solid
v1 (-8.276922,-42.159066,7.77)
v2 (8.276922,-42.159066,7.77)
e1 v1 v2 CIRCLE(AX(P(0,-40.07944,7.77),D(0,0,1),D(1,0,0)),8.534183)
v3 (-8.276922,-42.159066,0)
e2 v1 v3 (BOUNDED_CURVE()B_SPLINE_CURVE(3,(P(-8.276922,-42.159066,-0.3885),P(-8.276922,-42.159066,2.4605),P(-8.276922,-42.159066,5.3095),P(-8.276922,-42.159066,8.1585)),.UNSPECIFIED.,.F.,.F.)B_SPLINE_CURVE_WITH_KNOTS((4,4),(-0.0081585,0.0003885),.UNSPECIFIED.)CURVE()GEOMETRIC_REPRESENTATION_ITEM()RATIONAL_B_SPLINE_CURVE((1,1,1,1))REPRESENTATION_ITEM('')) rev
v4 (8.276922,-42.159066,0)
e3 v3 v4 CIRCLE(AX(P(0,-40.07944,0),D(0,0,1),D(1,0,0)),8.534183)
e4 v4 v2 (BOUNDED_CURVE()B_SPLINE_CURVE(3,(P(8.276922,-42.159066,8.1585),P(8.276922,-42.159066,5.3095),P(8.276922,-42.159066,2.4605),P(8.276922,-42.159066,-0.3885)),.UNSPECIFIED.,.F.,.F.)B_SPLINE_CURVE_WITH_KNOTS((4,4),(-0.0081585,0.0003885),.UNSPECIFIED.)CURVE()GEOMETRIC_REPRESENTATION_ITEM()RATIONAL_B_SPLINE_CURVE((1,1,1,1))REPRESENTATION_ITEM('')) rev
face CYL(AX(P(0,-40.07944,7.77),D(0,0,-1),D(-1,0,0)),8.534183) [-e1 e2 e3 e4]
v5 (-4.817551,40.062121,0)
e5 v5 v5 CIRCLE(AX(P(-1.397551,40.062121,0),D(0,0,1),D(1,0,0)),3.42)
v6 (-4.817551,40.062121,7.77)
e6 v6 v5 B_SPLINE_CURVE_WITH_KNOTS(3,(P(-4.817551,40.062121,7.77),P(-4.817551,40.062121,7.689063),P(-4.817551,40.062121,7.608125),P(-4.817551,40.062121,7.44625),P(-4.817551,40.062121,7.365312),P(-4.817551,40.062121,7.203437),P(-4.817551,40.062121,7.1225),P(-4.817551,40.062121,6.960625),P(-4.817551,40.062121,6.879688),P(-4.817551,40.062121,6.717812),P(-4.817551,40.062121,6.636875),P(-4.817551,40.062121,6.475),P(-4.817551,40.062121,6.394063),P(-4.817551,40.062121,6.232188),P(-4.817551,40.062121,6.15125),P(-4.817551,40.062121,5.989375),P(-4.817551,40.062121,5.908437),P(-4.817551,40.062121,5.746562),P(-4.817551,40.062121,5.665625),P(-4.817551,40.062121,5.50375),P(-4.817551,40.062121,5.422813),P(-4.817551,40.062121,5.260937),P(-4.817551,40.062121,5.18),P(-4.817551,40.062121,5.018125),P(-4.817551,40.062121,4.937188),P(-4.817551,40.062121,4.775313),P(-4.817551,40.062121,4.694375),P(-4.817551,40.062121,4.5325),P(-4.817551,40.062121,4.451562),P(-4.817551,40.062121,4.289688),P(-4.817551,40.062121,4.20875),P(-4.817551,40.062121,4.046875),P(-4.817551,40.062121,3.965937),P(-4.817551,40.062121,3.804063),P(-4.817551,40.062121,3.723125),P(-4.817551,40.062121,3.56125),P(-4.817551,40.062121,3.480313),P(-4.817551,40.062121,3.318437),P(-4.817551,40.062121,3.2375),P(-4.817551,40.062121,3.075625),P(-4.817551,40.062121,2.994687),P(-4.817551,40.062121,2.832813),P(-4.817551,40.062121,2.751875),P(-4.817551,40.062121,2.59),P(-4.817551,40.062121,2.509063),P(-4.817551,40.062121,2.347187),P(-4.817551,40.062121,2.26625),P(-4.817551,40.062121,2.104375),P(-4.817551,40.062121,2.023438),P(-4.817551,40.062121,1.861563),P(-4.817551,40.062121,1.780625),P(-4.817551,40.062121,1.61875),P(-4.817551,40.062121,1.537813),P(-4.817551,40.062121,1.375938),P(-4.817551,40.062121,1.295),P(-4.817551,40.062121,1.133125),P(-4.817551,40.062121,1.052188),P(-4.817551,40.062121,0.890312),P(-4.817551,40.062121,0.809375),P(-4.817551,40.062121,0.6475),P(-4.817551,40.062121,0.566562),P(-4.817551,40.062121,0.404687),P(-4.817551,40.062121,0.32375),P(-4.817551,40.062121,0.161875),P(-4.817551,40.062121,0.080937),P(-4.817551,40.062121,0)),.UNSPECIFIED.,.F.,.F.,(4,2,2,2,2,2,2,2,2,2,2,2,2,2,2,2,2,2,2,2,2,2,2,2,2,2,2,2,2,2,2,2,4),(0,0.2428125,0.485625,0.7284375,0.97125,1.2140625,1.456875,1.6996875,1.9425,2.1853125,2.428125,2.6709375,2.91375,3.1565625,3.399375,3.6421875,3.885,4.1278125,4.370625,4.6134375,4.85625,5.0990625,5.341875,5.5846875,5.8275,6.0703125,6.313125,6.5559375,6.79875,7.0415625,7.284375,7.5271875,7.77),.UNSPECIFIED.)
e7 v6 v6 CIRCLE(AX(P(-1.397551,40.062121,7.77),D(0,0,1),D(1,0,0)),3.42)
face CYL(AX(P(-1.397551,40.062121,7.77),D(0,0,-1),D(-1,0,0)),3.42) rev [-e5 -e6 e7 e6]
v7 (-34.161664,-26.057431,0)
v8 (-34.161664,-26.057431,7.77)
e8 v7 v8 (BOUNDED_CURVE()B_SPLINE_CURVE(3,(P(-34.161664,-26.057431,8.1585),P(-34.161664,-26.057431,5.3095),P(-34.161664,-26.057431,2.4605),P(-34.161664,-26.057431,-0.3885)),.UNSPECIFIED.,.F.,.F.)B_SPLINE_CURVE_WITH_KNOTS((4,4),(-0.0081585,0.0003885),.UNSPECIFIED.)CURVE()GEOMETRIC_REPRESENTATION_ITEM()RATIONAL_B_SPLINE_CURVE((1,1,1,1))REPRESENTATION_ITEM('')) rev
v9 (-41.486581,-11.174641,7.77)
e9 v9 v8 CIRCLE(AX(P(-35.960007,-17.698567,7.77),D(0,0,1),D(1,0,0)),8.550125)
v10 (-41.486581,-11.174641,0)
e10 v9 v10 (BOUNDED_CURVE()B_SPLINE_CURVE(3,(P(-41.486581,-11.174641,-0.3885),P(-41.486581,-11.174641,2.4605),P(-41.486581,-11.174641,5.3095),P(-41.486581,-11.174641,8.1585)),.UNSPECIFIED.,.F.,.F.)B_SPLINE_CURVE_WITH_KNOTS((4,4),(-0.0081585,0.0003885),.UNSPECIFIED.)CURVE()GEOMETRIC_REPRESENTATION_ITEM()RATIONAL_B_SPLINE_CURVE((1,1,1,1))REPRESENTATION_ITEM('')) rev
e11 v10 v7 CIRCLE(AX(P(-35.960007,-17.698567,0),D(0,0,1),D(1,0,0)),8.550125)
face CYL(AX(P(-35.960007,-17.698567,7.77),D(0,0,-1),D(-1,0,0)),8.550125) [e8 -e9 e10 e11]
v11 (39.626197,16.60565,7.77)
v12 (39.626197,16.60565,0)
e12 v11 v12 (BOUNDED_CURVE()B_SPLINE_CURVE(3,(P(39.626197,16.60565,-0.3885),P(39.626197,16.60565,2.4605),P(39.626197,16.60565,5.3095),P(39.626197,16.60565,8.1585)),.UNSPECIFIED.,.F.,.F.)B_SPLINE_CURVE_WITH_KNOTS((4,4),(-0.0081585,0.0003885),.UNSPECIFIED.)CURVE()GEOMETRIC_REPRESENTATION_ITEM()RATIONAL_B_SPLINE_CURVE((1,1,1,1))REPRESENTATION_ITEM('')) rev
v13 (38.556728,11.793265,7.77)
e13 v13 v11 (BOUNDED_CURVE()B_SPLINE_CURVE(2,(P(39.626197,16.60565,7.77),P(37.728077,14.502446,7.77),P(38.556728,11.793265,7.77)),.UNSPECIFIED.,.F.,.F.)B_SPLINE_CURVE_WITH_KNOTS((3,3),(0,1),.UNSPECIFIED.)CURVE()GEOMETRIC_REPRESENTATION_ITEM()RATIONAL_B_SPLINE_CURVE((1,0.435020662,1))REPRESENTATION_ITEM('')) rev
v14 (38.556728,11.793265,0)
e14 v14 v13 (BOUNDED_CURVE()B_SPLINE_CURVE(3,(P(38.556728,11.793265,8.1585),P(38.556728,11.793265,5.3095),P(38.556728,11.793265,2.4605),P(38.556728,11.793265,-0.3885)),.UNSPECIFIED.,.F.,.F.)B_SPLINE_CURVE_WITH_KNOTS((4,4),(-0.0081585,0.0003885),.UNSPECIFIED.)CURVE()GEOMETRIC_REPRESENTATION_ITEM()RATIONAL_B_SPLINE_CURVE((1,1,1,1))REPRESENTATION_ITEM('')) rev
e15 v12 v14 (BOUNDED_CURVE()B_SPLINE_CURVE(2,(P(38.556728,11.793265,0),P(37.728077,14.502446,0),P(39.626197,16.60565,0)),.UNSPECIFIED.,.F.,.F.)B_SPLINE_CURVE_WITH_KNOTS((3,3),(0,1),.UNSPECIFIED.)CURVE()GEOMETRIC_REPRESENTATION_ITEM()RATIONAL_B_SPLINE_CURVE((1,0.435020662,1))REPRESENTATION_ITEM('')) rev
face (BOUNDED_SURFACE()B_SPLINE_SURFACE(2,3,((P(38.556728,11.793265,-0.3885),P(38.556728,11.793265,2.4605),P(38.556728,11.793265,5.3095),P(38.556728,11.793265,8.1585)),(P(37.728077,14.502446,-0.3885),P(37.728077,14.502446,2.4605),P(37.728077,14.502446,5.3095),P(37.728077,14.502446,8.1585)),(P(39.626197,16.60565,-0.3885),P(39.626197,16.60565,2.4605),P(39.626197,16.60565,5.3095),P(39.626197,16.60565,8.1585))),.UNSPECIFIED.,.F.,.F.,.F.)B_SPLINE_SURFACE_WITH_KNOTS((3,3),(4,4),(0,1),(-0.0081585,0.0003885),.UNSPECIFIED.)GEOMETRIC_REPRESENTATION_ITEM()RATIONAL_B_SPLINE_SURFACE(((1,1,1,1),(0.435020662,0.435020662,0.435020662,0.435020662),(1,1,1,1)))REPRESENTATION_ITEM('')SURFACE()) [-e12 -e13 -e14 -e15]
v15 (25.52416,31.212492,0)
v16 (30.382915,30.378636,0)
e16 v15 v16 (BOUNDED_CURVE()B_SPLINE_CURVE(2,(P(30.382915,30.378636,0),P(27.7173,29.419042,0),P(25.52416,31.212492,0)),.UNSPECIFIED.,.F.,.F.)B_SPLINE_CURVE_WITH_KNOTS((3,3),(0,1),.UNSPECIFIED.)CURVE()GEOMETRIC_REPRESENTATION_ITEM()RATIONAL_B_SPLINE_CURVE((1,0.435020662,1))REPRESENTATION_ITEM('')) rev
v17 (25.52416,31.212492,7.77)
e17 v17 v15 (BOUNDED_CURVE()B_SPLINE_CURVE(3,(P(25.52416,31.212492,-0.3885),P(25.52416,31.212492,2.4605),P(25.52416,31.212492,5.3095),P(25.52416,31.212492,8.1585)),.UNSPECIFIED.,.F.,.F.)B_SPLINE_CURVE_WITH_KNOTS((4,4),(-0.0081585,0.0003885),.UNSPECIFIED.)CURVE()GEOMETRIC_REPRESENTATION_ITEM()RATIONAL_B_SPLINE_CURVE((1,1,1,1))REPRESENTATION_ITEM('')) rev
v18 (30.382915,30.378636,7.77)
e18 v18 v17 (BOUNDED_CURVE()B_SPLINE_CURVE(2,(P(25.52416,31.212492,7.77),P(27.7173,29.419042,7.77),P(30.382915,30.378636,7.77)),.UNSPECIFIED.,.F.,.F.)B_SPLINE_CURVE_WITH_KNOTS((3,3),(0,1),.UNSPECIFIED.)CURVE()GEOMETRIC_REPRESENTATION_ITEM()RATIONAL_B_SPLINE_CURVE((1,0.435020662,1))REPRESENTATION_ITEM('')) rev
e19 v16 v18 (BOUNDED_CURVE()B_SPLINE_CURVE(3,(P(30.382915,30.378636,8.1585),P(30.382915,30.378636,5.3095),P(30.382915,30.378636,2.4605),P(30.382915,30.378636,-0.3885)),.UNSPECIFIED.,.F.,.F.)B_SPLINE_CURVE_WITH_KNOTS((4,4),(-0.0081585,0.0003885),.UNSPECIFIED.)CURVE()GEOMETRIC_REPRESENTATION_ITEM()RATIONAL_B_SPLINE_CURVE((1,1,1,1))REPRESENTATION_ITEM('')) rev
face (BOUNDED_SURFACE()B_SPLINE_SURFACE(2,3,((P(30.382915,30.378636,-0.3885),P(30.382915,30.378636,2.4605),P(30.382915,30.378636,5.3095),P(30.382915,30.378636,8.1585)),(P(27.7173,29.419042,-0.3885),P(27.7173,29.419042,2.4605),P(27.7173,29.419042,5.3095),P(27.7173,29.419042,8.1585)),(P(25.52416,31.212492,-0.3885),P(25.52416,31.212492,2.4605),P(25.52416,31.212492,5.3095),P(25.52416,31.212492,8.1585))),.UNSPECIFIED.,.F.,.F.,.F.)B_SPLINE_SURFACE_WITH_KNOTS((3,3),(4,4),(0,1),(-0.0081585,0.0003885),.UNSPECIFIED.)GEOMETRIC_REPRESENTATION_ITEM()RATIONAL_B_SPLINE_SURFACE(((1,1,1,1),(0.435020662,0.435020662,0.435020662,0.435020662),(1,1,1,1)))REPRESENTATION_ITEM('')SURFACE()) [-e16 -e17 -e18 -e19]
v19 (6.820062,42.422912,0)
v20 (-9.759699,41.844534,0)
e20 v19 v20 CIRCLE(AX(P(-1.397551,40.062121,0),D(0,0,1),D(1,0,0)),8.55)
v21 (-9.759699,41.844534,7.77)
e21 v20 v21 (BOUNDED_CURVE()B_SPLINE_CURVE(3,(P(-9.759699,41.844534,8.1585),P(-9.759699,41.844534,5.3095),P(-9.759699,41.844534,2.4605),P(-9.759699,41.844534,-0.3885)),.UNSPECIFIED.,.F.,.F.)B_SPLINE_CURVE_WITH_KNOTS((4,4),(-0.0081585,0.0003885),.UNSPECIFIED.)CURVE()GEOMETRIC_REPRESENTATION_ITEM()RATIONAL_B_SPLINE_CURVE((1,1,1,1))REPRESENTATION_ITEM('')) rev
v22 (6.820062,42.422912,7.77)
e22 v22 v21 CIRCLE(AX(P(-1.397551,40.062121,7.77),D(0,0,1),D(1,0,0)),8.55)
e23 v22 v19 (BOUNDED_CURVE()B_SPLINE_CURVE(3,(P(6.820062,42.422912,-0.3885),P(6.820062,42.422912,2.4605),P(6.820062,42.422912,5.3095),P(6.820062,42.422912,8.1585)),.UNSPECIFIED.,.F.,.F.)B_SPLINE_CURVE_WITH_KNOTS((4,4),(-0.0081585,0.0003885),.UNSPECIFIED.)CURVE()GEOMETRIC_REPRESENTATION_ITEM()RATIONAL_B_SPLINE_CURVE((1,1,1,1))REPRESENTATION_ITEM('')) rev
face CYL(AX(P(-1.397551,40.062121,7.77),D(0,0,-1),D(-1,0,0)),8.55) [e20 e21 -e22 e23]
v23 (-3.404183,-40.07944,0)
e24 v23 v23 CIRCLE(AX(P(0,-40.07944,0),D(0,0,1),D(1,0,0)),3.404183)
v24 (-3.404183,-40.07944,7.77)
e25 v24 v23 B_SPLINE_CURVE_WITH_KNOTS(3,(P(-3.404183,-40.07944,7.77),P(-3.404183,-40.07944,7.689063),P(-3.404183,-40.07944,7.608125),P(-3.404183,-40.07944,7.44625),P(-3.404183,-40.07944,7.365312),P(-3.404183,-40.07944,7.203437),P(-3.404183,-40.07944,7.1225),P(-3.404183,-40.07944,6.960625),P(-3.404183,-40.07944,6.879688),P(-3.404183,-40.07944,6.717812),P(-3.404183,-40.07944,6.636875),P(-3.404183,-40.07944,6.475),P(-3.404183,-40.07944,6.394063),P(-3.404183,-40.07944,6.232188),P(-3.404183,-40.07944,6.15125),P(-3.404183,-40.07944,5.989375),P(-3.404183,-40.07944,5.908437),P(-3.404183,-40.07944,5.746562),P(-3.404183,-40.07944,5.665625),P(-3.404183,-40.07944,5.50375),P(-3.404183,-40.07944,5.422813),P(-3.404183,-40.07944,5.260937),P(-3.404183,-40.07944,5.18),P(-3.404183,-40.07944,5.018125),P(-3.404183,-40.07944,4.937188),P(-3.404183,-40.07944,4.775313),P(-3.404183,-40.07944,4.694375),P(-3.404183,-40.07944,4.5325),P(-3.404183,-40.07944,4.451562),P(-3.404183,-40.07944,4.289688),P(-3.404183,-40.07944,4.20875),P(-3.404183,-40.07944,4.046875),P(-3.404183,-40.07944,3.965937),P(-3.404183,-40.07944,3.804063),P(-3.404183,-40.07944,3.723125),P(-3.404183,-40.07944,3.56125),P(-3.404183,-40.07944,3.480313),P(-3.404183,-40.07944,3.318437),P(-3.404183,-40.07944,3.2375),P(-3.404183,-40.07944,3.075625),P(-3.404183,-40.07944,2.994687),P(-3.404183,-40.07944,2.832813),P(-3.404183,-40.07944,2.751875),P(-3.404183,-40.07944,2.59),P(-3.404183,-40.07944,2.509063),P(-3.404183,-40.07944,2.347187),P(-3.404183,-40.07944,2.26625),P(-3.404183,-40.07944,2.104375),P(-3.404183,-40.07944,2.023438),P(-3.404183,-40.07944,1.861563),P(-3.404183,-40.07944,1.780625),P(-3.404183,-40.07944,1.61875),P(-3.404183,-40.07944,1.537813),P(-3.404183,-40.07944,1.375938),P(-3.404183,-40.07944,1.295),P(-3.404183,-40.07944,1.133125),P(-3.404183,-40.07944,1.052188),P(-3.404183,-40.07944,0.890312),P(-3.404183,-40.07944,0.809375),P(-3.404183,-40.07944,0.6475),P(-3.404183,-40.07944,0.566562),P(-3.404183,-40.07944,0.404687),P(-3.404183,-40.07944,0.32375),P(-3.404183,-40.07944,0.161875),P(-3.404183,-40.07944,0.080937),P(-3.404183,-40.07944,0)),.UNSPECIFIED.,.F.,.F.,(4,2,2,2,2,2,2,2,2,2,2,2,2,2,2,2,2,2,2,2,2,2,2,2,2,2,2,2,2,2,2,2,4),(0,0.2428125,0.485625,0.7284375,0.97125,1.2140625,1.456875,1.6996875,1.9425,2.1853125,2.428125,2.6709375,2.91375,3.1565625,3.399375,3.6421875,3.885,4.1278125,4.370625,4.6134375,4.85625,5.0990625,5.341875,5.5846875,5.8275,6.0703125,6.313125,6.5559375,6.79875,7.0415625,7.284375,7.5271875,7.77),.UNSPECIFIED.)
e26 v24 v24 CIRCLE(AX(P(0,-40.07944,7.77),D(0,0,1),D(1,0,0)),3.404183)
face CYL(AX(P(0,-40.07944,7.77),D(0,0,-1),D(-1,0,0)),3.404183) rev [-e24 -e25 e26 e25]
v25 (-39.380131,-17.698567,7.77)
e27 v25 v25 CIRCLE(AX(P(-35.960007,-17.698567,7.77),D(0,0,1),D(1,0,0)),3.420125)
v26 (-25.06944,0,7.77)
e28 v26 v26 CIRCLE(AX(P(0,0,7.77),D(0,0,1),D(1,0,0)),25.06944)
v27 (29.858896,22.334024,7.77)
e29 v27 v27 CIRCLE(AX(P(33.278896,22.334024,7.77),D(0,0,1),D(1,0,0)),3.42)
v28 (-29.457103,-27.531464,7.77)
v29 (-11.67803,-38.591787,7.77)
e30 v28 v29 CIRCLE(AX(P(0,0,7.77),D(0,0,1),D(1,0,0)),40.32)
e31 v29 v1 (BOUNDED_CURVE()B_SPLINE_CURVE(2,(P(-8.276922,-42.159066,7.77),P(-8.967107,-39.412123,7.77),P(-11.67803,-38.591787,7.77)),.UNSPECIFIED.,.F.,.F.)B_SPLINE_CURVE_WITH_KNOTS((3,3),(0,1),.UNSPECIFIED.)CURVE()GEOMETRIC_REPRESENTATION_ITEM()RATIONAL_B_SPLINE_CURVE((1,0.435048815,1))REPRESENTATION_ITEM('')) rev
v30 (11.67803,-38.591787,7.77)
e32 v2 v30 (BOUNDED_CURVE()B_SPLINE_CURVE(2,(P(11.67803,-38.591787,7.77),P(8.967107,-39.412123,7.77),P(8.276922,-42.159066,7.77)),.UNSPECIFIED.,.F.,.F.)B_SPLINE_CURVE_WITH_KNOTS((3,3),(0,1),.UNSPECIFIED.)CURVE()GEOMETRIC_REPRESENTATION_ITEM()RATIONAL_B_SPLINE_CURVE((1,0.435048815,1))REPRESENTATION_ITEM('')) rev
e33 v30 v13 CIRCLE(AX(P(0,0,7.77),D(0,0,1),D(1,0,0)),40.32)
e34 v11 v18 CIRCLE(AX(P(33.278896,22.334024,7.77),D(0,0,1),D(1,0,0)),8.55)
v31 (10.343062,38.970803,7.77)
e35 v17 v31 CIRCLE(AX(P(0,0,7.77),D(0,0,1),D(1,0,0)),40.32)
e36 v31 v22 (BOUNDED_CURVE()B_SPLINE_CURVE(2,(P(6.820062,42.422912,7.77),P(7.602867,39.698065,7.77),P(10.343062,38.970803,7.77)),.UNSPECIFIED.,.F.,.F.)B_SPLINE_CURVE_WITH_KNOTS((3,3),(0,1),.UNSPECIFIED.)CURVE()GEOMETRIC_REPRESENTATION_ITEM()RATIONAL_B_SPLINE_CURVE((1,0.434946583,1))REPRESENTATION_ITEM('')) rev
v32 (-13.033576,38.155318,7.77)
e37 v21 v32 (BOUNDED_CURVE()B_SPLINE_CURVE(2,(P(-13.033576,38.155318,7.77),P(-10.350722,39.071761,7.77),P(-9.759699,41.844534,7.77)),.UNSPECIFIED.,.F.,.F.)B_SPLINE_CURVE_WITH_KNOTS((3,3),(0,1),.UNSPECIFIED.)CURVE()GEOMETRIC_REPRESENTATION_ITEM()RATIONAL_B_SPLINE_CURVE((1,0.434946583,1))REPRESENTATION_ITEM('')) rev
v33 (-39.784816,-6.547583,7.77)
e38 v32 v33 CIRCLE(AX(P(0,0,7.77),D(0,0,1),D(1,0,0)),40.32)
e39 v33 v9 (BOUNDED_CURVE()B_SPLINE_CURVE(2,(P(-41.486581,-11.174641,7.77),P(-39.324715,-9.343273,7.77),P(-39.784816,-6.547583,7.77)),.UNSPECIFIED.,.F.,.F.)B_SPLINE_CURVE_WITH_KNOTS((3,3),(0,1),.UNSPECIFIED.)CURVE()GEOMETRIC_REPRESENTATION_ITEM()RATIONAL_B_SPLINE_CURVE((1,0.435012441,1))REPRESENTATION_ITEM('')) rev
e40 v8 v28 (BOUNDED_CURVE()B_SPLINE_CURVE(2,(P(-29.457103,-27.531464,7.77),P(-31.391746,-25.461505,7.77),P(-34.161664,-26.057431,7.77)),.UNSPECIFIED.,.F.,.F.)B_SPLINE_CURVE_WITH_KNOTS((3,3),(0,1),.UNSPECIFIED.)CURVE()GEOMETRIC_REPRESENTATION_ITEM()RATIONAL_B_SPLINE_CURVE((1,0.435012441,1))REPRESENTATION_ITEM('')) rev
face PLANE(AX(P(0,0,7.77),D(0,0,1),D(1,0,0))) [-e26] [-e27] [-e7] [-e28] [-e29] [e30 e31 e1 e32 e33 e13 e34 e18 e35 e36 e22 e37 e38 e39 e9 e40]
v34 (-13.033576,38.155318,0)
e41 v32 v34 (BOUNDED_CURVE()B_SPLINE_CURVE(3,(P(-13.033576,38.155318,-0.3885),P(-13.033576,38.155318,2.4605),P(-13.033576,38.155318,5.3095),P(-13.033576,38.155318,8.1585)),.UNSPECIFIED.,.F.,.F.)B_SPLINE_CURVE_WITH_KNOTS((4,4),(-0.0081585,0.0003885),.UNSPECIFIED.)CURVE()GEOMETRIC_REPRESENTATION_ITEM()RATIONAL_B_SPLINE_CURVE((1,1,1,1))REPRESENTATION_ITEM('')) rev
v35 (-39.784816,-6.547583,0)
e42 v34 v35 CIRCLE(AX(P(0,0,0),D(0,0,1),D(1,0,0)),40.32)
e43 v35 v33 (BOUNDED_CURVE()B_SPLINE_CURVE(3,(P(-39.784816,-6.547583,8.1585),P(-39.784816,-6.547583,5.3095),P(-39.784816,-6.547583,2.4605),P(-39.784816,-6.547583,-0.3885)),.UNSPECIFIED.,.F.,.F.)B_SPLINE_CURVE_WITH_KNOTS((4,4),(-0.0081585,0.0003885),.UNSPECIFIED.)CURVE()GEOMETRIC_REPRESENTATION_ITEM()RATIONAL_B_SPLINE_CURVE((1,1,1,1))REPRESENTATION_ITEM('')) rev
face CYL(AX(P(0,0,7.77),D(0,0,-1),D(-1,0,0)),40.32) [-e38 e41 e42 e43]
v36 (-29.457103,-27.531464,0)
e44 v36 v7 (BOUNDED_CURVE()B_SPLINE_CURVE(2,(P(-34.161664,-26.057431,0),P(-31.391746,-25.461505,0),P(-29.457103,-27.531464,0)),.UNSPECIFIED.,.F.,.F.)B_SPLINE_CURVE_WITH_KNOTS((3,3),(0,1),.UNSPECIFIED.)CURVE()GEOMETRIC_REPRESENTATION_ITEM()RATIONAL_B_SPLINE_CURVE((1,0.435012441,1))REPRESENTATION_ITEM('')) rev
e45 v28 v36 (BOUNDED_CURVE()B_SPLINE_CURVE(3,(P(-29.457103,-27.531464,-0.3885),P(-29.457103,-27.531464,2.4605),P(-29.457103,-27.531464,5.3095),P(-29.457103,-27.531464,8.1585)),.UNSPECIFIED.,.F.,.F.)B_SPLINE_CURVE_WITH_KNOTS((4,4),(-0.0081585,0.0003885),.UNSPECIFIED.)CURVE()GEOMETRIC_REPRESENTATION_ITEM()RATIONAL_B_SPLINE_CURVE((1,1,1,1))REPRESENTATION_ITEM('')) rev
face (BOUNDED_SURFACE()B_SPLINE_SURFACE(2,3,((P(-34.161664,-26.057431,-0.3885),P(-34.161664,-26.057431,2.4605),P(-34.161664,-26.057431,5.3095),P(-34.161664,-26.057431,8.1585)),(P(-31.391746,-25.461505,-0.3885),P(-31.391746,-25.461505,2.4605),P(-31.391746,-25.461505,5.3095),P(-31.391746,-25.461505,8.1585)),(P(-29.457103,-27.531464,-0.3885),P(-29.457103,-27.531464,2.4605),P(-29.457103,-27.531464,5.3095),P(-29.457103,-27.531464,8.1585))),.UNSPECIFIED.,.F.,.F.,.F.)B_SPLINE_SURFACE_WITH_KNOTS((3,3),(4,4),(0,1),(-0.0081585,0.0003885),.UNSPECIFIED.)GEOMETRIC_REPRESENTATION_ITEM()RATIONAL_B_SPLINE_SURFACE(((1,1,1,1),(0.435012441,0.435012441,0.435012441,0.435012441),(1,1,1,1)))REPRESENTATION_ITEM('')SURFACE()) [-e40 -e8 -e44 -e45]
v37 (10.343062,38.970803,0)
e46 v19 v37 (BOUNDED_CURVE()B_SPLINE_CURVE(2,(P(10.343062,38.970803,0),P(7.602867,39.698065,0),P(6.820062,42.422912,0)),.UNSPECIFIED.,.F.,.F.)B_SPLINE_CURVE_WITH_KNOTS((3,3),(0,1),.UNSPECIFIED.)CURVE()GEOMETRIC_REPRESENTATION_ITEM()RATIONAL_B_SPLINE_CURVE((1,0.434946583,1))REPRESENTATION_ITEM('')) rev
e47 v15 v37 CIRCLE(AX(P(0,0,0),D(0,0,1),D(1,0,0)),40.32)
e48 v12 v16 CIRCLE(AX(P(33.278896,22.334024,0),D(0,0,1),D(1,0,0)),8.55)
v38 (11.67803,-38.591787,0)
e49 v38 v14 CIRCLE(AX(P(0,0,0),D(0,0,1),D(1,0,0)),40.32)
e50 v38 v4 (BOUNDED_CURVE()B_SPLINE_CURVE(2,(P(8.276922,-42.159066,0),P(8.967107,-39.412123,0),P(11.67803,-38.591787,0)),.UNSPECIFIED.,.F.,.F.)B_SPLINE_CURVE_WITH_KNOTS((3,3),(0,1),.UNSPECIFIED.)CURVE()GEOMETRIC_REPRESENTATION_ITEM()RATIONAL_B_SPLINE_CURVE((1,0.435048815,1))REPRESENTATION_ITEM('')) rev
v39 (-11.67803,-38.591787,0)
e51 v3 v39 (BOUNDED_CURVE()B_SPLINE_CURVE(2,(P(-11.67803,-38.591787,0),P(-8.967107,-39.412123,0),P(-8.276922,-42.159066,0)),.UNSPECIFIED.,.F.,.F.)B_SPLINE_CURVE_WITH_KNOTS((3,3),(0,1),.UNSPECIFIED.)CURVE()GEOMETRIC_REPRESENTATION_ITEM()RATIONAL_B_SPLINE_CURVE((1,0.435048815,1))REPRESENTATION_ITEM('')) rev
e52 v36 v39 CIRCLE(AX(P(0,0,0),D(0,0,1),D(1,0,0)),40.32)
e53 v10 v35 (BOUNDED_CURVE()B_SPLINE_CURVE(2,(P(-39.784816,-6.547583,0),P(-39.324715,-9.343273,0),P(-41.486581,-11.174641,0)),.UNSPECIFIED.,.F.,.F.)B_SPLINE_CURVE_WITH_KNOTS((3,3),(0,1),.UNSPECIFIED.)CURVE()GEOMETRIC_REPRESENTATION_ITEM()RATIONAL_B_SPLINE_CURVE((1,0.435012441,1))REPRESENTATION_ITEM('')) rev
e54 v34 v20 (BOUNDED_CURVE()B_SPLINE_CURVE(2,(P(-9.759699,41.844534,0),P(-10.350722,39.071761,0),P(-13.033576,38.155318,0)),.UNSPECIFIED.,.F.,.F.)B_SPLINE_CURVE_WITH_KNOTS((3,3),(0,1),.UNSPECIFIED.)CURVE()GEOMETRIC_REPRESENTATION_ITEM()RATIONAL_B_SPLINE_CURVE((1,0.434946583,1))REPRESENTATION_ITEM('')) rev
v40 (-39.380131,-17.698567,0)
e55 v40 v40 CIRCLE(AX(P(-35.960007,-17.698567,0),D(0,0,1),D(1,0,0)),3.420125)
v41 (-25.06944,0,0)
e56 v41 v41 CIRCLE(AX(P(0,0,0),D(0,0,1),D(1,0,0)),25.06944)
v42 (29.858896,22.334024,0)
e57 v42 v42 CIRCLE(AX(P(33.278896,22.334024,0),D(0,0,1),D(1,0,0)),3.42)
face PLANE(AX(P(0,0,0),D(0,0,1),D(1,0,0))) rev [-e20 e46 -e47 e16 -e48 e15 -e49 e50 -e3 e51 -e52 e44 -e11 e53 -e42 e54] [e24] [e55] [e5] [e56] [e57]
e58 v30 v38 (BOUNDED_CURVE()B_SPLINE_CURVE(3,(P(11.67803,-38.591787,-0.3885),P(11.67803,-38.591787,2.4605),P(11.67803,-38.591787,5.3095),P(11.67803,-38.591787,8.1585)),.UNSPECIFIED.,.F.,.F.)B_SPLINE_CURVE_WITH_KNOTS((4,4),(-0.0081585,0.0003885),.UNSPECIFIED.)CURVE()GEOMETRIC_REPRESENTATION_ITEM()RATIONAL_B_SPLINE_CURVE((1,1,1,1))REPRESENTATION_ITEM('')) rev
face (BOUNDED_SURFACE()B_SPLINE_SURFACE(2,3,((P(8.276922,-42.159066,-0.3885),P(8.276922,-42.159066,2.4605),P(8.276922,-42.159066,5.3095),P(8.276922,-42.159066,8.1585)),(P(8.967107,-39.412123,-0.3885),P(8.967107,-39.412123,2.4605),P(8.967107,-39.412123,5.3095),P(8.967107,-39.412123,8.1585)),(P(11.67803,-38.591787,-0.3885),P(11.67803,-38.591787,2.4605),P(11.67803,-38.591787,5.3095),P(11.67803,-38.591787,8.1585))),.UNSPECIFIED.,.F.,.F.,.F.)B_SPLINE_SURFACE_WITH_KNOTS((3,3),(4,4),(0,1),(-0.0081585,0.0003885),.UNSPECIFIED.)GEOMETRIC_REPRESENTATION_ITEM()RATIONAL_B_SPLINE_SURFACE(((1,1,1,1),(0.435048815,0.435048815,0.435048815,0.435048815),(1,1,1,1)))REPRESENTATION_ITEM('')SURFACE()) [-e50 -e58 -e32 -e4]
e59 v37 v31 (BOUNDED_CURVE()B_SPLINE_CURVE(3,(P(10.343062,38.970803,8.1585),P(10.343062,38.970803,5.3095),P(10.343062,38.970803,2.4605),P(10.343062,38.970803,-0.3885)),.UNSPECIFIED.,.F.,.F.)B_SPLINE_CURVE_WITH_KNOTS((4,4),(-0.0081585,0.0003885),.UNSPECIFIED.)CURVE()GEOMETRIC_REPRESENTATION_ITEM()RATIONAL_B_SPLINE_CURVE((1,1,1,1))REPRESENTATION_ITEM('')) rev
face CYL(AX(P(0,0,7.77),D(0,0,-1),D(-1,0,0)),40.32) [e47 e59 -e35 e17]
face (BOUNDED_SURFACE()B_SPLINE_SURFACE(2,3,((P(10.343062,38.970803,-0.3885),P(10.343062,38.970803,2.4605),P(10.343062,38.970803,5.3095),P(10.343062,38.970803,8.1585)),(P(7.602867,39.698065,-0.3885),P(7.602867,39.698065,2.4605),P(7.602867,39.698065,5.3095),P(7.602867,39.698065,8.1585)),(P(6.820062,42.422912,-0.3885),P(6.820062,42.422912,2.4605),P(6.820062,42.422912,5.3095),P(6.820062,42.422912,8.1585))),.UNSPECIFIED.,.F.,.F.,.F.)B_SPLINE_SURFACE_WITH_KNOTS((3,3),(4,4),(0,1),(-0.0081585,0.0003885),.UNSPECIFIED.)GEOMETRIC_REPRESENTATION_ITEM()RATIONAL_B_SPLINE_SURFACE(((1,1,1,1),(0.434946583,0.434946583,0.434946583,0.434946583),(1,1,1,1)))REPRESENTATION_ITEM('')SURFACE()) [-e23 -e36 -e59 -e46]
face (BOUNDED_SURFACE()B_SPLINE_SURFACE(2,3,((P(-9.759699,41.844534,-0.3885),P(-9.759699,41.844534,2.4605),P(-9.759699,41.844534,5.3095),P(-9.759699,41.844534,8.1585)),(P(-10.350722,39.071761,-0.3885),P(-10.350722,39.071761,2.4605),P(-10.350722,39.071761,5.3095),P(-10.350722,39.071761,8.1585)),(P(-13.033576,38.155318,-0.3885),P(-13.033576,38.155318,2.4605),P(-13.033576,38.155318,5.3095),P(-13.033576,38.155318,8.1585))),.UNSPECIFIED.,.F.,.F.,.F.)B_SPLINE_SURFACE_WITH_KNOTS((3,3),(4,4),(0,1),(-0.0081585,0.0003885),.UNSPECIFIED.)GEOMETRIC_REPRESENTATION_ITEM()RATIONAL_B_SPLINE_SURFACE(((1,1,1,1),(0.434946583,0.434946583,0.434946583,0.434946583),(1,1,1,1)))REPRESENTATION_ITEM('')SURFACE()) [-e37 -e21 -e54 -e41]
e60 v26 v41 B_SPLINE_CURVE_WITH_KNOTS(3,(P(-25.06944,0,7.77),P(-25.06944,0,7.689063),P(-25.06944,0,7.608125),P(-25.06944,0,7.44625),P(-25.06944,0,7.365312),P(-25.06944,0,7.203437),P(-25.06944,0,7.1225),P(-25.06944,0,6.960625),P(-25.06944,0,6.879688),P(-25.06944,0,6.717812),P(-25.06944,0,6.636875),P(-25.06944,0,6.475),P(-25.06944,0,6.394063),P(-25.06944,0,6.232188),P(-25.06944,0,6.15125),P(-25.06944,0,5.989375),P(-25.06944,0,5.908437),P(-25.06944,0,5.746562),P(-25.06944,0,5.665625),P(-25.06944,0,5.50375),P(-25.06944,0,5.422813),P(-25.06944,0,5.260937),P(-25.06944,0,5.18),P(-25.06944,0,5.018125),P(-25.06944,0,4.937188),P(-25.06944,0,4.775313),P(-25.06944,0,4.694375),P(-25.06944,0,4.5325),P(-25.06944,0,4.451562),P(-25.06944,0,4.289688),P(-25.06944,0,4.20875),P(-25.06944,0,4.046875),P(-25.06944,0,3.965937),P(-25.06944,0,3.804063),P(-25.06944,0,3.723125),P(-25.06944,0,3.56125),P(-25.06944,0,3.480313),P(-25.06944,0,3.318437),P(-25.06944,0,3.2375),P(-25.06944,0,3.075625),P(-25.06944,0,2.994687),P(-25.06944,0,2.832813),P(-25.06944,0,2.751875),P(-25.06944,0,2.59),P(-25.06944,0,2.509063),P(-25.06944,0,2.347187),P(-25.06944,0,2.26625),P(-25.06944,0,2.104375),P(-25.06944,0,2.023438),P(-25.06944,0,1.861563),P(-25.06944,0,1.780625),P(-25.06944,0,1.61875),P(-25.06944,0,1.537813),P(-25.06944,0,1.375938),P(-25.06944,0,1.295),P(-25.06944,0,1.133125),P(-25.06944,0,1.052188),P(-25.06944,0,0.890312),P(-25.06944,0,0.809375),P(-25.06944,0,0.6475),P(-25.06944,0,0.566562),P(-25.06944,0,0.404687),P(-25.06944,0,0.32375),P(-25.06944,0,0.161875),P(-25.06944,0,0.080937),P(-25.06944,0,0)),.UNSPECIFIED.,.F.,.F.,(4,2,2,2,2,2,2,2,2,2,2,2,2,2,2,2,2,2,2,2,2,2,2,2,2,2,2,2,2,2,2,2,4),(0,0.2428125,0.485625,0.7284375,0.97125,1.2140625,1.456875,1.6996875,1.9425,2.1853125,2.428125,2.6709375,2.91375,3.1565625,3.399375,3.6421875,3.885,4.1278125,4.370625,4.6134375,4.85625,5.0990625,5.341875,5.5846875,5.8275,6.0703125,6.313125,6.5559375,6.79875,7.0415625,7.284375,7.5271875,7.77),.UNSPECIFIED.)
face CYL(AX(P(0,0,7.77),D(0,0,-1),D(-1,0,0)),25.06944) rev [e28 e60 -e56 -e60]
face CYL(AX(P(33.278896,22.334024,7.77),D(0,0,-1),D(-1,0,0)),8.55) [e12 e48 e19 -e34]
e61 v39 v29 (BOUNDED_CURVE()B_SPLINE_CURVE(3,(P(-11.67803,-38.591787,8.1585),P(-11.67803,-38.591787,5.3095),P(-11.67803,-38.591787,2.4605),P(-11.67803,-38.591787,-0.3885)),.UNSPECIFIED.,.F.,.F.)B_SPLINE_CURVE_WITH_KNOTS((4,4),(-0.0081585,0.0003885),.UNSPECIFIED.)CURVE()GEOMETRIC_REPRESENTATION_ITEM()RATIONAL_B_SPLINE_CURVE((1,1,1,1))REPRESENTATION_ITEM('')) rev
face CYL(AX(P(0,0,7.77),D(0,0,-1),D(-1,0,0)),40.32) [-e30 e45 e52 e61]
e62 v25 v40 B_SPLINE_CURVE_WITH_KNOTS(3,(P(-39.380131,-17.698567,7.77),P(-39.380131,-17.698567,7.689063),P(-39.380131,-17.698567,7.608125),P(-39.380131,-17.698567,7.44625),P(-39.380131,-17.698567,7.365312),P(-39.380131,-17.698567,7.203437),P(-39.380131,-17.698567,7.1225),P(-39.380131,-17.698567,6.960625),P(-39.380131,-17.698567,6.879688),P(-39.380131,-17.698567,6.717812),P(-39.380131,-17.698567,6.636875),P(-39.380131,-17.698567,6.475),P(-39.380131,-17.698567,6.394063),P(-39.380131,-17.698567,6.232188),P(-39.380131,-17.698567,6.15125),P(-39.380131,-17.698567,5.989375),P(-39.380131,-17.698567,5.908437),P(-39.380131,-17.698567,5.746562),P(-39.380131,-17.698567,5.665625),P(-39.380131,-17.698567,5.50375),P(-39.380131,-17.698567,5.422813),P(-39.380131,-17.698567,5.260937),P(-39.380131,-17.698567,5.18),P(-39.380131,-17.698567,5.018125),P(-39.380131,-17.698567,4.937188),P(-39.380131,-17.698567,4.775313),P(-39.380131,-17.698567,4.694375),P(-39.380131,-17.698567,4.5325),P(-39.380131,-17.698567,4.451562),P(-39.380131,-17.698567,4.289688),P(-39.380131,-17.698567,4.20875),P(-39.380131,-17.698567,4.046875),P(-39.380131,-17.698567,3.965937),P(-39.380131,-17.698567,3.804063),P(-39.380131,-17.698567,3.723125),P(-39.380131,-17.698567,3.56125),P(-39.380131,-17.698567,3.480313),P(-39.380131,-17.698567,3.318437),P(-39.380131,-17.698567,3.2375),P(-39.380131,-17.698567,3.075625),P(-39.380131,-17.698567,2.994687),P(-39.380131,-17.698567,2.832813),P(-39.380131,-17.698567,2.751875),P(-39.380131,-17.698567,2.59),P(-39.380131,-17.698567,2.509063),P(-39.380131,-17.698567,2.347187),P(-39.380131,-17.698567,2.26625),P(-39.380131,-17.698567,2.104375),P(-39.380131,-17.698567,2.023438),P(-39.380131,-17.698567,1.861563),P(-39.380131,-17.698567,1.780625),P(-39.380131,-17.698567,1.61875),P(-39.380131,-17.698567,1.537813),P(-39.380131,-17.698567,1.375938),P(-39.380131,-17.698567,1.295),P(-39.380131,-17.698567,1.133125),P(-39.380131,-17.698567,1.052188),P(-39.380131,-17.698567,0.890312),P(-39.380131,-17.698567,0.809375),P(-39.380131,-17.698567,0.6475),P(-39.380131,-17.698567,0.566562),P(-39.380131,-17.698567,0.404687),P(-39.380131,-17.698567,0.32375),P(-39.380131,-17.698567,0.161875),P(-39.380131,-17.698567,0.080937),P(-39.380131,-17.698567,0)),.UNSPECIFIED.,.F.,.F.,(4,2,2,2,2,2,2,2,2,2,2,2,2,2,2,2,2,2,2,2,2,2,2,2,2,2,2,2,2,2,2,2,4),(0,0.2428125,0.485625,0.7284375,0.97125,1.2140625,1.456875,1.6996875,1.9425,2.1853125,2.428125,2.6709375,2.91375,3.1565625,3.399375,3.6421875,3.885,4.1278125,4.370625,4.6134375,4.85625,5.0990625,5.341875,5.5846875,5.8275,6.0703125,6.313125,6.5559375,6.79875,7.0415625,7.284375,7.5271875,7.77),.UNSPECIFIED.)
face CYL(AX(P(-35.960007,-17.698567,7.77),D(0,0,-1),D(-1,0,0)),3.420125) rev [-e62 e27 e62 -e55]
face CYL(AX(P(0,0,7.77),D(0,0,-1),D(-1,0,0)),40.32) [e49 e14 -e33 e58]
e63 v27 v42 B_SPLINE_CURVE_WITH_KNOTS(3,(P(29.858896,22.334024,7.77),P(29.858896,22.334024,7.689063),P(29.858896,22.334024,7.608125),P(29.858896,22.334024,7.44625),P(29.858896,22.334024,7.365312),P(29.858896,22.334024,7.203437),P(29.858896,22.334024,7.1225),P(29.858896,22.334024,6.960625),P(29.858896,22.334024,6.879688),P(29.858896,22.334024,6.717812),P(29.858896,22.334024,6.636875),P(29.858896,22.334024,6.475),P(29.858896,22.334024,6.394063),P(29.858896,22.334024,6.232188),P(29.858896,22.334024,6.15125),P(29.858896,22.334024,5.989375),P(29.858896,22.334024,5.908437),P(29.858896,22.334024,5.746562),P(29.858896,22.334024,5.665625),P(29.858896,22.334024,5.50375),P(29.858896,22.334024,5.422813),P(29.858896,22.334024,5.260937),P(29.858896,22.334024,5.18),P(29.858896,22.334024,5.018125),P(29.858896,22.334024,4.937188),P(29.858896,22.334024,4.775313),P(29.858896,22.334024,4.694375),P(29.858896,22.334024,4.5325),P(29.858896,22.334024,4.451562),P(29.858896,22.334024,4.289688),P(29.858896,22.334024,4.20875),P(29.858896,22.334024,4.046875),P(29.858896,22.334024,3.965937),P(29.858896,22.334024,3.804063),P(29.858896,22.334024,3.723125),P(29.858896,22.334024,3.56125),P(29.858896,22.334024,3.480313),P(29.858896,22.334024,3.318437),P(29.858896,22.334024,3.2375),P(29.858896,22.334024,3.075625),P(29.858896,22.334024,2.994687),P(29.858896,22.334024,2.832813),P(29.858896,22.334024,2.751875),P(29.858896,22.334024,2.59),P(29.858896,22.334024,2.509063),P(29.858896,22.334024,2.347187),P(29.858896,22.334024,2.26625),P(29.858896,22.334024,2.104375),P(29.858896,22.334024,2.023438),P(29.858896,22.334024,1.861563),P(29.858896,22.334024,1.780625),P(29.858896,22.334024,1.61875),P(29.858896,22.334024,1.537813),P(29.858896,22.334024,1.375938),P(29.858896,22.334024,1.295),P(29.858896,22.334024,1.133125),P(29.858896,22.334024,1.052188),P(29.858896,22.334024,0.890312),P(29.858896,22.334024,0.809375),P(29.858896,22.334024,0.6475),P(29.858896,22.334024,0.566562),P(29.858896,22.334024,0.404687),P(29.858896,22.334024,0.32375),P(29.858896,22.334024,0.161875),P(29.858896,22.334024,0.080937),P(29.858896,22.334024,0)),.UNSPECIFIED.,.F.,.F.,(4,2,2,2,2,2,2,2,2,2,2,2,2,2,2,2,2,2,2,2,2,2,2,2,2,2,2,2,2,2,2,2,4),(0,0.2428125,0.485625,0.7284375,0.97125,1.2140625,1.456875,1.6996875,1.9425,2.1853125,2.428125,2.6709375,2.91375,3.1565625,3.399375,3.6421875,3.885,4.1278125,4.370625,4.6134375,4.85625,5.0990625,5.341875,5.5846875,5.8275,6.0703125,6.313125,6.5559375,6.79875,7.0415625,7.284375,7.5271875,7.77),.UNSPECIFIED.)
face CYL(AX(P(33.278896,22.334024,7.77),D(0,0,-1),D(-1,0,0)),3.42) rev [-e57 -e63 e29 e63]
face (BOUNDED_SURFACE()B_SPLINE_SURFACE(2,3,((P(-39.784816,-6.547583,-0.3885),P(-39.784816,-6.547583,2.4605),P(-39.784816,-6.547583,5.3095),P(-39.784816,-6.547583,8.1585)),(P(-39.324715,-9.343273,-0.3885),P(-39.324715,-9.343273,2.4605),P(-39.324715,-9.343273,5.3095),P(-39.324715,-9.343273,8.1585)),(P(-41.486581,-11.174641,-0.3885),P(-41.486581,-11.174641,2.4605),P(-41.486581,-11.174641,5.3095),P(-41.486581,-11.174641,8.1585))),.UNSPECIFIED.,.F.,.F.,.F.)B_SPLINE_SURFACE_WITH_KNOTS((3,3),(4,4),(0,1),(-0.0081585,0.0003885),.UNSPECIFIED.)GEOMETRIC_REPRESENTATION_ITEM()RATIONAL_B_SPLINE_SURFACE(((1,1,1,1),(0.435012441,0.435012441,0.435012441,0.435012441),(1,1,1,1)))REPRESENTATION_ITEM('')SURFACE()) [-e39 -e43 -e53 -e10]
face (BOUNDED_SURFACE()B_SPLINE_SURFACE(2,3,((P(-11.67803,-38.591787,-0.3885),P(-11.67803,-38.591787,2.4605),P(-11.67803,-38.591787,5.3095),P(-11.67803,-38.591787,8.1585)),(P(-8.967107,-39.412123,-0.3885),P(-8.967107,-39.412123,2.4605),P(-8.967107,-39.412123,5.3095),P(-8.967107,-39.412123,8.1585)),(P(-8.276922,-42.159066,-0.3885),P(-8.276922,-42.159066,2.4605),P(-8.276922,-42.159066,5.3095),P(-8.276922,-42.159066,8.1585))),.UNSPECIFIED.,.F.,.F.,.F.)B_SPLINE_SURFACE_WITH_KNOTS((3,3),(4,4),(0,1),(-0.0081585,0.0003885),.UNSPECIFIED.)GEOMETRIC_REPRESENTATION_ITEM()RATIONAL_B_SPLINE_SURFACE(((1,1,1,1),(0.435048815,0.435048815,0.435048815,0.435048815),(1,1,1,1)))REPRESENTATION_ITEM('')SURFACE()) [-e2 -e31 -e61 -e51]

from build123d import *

# Parameters (mm, degrees)
BOSS_EXTRUDE1_DEPTH = 7.77


with BuildPart() as part:
    # Sketch1 → Boss-Extrude1 (new body)
    # profile 1 of 5: a face of its own
    with BuildSketch(Plane.XY):
        with BuildLine():
            ThreePointArc((3.404182759, -40.079440399), (3.403839221, -40.127801725), (3.402808675, -40.176153289))
            ThreePointArc((3.402808675, -40.176153289), (5.967670482, -39.875923927), (8.508052822, -39.412122972))
            ThreePointArc((8.508052822, -39.412122972), (35.574552979, -18.977712726), (37.472579791, 14.883150333))
            ThreePointArc((37.472579791, 14.883150333), (36.442962914, 17.251459476), (35.263848757, 19.548999228))
            ThreePointArc((35.263848757, 19.548999228), (30.43912953, 20.428209113), (31.453728524, 25.226283157))
            ThreePointArc((31.453728524, 25.226283157), (29.774333348, 27.188075947), (27.972797119, 29.038337096))
            ThreePointArc((27.972797119, 29.038337096), (18.347193458, 35.903800526), (7.14399719, 39.682057711))
            ThreePointArc((7.14399719, 39.682057711), (4.589484945, 40.057945878), (2.016151733, 40.269560864))
            ThreePointArc((2.016151733, 40.269560864), (2.020874049, 40.165888855), (2.022448638, 40.062121295))
            ThreePointArc((2.022448638, 40.062121295), (-1.382077907, 36.642156299), (-4.817411346, 40.031174701))
            ThreePointArc((-4.817411346, 40.031174701), (-7.369742742, 39.640752918), (-9.891851642, 39.087768817))
            ThreePointArc((-9.891851642, 39.087768817), (-34.597565404, 20.705334291), (-39.122221714, -9.7546998))
            ThreePointArc((-39.122221714, -9.7546998), (-38.417536694, -12.239087971), (-37.555259765, -14.673270392))
            ThreePointArc((-37.555259765, -14.673270392), (-34.193471955, -14.769982316), (-32.539881663, -17.698567233))
            ThreePointArc((-32.539881663, -17.698567233), (-33.081813677, -19.546068243), (-34.535867272, -20.808081887))
            ThreePointArc((-34.535867272, -20.808081887), (-33.133010631, -22.976205225), (-31.594239644, -25.05007827))
            ThreePointArc((-31.594239644, -25.05007827), (-21.298252211, -34.235754012), (-8.508052822, -39.412122972))
            ThreePointArc((-8.508052822, -39.412122972), (-5.967670482, -39.875923927), (-3.402808675, -40.176153289))
            ThreePointArc((-3.402808675, -40.176153289), (-0.048361325, -36.675601178), (3.404182759, -40.079440399))
        make_face()
        with BuildLine():
            ThreePointArc((-22.494419384, -11.066975129), (-5.681299846, 24.417200372), (25.069440399, 0))
            ThreePointArc((25.069440399, 0), (5.681299846, -24.417200372), (-22.494419384, -11.066975129))
        make_face(mode=Mode.SUBTRACT)
    # profile 2 of 5: a face of its own
    with BuildSketch(Plane.XY):
        with BuildLine():
            ThreePointArc((35.263848757, 19.548999228), (36.442962914, 17.251459476), (37.472579791, 14.883150333))
            ThreePointArc((37.472579791, 14.883150333), (40.378310636, 27.098559849), (27.972797119, 29.038337096))
            ThreePointArc((27.972797119, 29.038337096), (29.774333348, 27.188075947), (31.453728524, 25.226283157))
            ThreePointArc((31.453728524, 25.226283157), (34.9303084, 25.328891825), (36.69889556, 22.334023609))
            ThreePointArc((36.69889556, 22.334023609), (36.319038644, 20.767521125), (35.263848757, 19.548999228))
        make_face()
    # profile 3 of 5: a face of its own
    with BuildSketch(Plane.XY):
        with BuildLine():
            ThreePointArc((2.016151733, 40.269560864), (4.589484945, 40.057945878), (7.14399719, 39.682057711))
            ThreePointArc((7.14399719, 39.682057711), (-1.695633435, 48.606923637), (-9.891851642, 39.087768817))
            ThreePointArc((-9.891851642, 39.087768817), (-7.369742742, 39.640752918), (-4.817411346, 40.031174701))
            ThreePointArc((-4.817411346, 40.031174701), (-1.516784191, 43.480042232), (2.016151733, 40.269560864))
        make_face()
    # profile 4 of 5: a face of its own
    with BuildSketch(Plane.XY):
        with BuildLine():
            ThreePointArc((-39.122221714, -9.7546998), (-43.631335255, -21.474193014), (-31.594239644, -25.05007827))
            ThreePointArc((-31.594239644, -25.05007827), (-33.133010631, -22.976205225), (-34.535867272, -20.808081887))
            ThreePointArc((-34.535867272, -20.808081887), (-39.028605211, -19.208850623), (-37.555259765, -14.673270392))
            ThreePointArc((-37.555259765, -14.673270392), (-38.417536694, -12.239087971), (-39.122221714, -9.7546998))
        make_face()
    # profile 5 of 5: a face of its own
    with BuildSketch(Plane.XY):
        with BuildLine():
            ThreePointArc((8.508052822, -39.412122972), (5.967670482, -39.875923927), (3.402808675, -40.176153289))
            ThreePointArc((3.402808675, -40.176153289), (0, -43.483623159), (-3.402808675, -40.176153289))
            ThreePointArc((-3.402808675, -40.176153289), (-5.967670482, -39.875923927), (-8.508052822, -39.412122972))
            ThreePointArc((-8.508052822, -39.412122972), (0, -48.613623159), (8.508052822, -39.412122972))
        make_face()
    extrude(amount=BOSS_EXTRUDE1_DEPTH)

    # Fillet1
    # a fillet whose section is not a circle: 5 mm, written as the material it adds along each edge (its section moved 0.00015 mm through the faces so that the kernel can cut it)
    with BuildSketch(Plane(origin=(27.972797119, 29.038337096, 0), x_dir=(-0.7478052572443031, 0.6639181404644565, 0), z_dir=(0, 0, 1))) as fillet1_piece_1:
        with BuildLine():
            Bezier((3.27455803, 0), (0.443727696, -0.114917188), (-0.912581333, -2.602331942), weights=[1, 0.435020662, 1])
            Line((-0.912581333, -2.602331942), (-1.000377754, -2.554459315))
            ThreePointArc((-1.000377754, -2.554459315), (-0.444974343, -1.30513366), (-0.098468347, 0.017435156))
            Line((-0.098468347, 0.017435156), (0.004065293, 0.099917333))
            ThreePointArc((0.004065293, 0.099917333), (1.637282071, 0.066668632), (3.270501884, 0.099917705))
            Line((3.270501884, 0.099917705), (3.27455803, 0))
        make_face()
    extrude(amount=7.77)
    with BuildSketch(Plane(origin=(37.472579791, 14.883150333, 0), x_dir=(0.7809050051368507, 0.62464980024988, 0), z_dir=(0, 0, 1))) as fillet1_piece_2:
        with BuildLine():
            Bezier((2.757704884, 0), (-0.038396039, -0.456755922), (-1.083618682, -3.090064861), weights=[1, 0.435020662, 1])
            Line((-1.083618682, -3.090064861), (-1.176564622, -3.053172417))
            ThreePointArc((-1.176564622, -3.053172417), (-0.604722781, -1.522973292), (-0.09563314, 0.029228455))
            Line((-0.09563314, 0.029228455), (0.016132368, 0.098690155))
            ThreePointArc((0.016132368, 0.098690155), (1.378851781, -0.011991736), (2.741583111, 0.098691886))
            Line((2.741583111, 0.098691886), (2.757704884, 0))
        make_face()
    extrude(amount=7.77)
    with BuildSketch(Plane(origin=(-9.891851642, 39.087768817, 0), x_dir=(-0.9586545512733944, -0.2845724008452099, 0), z_dir=(0, 0, 1))) as fillet1_piece_3:
        with BuildLine():
            Bezier((3.277172257, 0), (0.444362291, -0.115089718), (-0.911320112, -2.605106418), weights=[1, 0.434946583, 1])
            Line((-0.911320112, -2.605106418), (-0.999146838, -2.557289411))
            ThreePointArc((-0.999146838, -2.557289411), (-0.444170839, -1.306571665), (-0.0984839, 0.017347088))
            Line((-0.0984839, 0.017347088), (0.004068531, 0.099917201))
            ThreePointArc((0.004068531, 0.099917201), (1.63858918, 0.066615488), (3.273112865, 0.099917573))
            Line((3.273112865, 0.099917573), (3.277172257, 0))
        make_face()
    extrude(amount=7.77)
    with BuildSketch(Plane(origin=(7.14399719, 39.682057711, 0), x_dir=(-0.11742410292813261, 0.9930818596931088, 0), z_dir=(0, 0, 1))) as fillet1_piece_4:
        with BuildLine():
            Bezier((2.759906483, 0), (-0.038093802, -0.45744109), (-1.082121081, -3.093359334), weights=[1, 0.434946583, 1])
            Line((-1.082121081, -3.093359334), (-1.175093979, -3.056534883))
            ThreePointArc((-1.175093979, -3.056534883), (-0.603940648, -1.524686137), (-0.095656384, 0.029152292))
            Line((-0.095656384, 0.029152292), (0.016145239, 0.09868805))
            ThreePointArc((0.016145239, 0.09868805), (1.379952571, -0.012171692), (2.743771831, 0.098689782))
            Line((2.743771831, 0.098689782), (2.759906483, 0))
        make_face()
    extrude(amount=7.77)
    with BuildSketch(Plane(origin=(-39.122221714, -9.7546998, 0), x_dir=(-0.8572531161014109, -0.5148952271427859, 0), z_dir=(0, 0, 1))) as fillet1_piece_5:
        with BuildLine():
            Bezier((2.757951127, 0), (-0.038361657, -0.456825585), (-1.083457749, -3.090421787), weights=[1, 0.435012441, 1])
            Line((-1.083457749, -3.090421787), (-1.176406599, -3.053536679))
            ThreePointArc((-1.176406599, -3.053536679), (-0.604638694, -1.523158848), (-0.095635652, 0.029220234))
            Line((-0.095635652, 0.029220234), (0.016133572, 0.098689958))
            ThreePointArc((0.016133572, 0.098689958), (1.378974902, -0.012010201), (2.741828149, 0.09869169))
            Line((2.741828149, 0.09869169), (2.757951127, 0))
        make_face()
    extrude(amount=7.77)
    with BuildSketch(Plane(origin=(-31.594239644, -25.05007827, 0), x_dir=(-0.9309287843318478, -0.36520076465203083, 0), z_dir=(0, 0, 1))) as fillet1_piece_6:
        with BuildLine():
            Bezier((2.757951127, 0), (-0.038361657, 0.456825585), (-1.083457749, 3.090421787), weights=[1, 0.435012441, 1])
            Line((-1.083457749, 3.090421787), (-1.176406599, 3.053536679))
            ThreePointArc((-1.176406599, 3.053536679), (-0.604638694, 1.523158848), (-0.095635652, -0.029220234))
            Line((-0.095635652, -0.029220234), (0.016133572, -0.098689958))
            ThreePointArc((0.016133572, -0.098689958), (1.378974902, 0.012010201), (2.741828149, -0.09869169))
            Line((2.741828149, -0.09869169), (2.757951127, 0))
        make_face()
    extrude(amount=7.77)
    with BuildSketch(Plane(origin=(-8.508052822, -39.412122972, 0), x_dir=(0.08389843348969565, -0.9964743111881886, 0), z_dir=(0, 0, 1))) as fillet1_piece_7:
        with BuildLine():
            Bezier((2.756625198, 0), (-0.038622025, -0.457301683), (-1.083539201, -3.089920144), weights=[1, 0.435048815, 1])
            Line((-1.083539201, -3.089920144), (-1.17648552, -3.053028659))
            ThreePointArc((-1.17648552, -3.053028659), (-0.604686345, -1.522900359), (-0.095633323, 0.029227856))
            Line((-0.095633323, 0.029227856), (0.016155935, 0.0986863))
            ThreePointArc((0.016155935, 0.0986863), (1.378311931, -0.012113558), (2.740479863, 0.098688034))
            Line((2.740479863, 0.098688034), (2.756625198, 0))
        make_face()
    extrude(amount=7.77)
    with BuildSketch(Plane(origin=(8.508052822, -39.412122972, 0), x_dir=(0.968097352048771, 0.25057437410109984, 0), z_dir=(0, 0, 1))) as fillet1_piece_8:
        with BuildLine():
            Bezier((3.274395165, 0), (0.444318442, -0.114880859), (-0.912202503, -2.601320641), weights=[1, 0.435048815, 1])
            Line((-0.912202503, -2.601320641), (-0.999987888, -2.553427781))
            ThreePointArc((-0.999987888, -2.553427781), (-0.444669934, -1.304668221), (-0.098472652, 0.017410827))
            Line((-0.098472652, 0.017410827), (0.004065091, 0.099917341))
            ThreePointArc((0.004065091, 0.099917341), (1.637200639, 0.066671941), (3.270339221, 0.099917713))
            Line((3.270339221, 0.099917713), (3.274395165, 0))
        make_face()
    extrude(amount=7.77)


solid = part.part
